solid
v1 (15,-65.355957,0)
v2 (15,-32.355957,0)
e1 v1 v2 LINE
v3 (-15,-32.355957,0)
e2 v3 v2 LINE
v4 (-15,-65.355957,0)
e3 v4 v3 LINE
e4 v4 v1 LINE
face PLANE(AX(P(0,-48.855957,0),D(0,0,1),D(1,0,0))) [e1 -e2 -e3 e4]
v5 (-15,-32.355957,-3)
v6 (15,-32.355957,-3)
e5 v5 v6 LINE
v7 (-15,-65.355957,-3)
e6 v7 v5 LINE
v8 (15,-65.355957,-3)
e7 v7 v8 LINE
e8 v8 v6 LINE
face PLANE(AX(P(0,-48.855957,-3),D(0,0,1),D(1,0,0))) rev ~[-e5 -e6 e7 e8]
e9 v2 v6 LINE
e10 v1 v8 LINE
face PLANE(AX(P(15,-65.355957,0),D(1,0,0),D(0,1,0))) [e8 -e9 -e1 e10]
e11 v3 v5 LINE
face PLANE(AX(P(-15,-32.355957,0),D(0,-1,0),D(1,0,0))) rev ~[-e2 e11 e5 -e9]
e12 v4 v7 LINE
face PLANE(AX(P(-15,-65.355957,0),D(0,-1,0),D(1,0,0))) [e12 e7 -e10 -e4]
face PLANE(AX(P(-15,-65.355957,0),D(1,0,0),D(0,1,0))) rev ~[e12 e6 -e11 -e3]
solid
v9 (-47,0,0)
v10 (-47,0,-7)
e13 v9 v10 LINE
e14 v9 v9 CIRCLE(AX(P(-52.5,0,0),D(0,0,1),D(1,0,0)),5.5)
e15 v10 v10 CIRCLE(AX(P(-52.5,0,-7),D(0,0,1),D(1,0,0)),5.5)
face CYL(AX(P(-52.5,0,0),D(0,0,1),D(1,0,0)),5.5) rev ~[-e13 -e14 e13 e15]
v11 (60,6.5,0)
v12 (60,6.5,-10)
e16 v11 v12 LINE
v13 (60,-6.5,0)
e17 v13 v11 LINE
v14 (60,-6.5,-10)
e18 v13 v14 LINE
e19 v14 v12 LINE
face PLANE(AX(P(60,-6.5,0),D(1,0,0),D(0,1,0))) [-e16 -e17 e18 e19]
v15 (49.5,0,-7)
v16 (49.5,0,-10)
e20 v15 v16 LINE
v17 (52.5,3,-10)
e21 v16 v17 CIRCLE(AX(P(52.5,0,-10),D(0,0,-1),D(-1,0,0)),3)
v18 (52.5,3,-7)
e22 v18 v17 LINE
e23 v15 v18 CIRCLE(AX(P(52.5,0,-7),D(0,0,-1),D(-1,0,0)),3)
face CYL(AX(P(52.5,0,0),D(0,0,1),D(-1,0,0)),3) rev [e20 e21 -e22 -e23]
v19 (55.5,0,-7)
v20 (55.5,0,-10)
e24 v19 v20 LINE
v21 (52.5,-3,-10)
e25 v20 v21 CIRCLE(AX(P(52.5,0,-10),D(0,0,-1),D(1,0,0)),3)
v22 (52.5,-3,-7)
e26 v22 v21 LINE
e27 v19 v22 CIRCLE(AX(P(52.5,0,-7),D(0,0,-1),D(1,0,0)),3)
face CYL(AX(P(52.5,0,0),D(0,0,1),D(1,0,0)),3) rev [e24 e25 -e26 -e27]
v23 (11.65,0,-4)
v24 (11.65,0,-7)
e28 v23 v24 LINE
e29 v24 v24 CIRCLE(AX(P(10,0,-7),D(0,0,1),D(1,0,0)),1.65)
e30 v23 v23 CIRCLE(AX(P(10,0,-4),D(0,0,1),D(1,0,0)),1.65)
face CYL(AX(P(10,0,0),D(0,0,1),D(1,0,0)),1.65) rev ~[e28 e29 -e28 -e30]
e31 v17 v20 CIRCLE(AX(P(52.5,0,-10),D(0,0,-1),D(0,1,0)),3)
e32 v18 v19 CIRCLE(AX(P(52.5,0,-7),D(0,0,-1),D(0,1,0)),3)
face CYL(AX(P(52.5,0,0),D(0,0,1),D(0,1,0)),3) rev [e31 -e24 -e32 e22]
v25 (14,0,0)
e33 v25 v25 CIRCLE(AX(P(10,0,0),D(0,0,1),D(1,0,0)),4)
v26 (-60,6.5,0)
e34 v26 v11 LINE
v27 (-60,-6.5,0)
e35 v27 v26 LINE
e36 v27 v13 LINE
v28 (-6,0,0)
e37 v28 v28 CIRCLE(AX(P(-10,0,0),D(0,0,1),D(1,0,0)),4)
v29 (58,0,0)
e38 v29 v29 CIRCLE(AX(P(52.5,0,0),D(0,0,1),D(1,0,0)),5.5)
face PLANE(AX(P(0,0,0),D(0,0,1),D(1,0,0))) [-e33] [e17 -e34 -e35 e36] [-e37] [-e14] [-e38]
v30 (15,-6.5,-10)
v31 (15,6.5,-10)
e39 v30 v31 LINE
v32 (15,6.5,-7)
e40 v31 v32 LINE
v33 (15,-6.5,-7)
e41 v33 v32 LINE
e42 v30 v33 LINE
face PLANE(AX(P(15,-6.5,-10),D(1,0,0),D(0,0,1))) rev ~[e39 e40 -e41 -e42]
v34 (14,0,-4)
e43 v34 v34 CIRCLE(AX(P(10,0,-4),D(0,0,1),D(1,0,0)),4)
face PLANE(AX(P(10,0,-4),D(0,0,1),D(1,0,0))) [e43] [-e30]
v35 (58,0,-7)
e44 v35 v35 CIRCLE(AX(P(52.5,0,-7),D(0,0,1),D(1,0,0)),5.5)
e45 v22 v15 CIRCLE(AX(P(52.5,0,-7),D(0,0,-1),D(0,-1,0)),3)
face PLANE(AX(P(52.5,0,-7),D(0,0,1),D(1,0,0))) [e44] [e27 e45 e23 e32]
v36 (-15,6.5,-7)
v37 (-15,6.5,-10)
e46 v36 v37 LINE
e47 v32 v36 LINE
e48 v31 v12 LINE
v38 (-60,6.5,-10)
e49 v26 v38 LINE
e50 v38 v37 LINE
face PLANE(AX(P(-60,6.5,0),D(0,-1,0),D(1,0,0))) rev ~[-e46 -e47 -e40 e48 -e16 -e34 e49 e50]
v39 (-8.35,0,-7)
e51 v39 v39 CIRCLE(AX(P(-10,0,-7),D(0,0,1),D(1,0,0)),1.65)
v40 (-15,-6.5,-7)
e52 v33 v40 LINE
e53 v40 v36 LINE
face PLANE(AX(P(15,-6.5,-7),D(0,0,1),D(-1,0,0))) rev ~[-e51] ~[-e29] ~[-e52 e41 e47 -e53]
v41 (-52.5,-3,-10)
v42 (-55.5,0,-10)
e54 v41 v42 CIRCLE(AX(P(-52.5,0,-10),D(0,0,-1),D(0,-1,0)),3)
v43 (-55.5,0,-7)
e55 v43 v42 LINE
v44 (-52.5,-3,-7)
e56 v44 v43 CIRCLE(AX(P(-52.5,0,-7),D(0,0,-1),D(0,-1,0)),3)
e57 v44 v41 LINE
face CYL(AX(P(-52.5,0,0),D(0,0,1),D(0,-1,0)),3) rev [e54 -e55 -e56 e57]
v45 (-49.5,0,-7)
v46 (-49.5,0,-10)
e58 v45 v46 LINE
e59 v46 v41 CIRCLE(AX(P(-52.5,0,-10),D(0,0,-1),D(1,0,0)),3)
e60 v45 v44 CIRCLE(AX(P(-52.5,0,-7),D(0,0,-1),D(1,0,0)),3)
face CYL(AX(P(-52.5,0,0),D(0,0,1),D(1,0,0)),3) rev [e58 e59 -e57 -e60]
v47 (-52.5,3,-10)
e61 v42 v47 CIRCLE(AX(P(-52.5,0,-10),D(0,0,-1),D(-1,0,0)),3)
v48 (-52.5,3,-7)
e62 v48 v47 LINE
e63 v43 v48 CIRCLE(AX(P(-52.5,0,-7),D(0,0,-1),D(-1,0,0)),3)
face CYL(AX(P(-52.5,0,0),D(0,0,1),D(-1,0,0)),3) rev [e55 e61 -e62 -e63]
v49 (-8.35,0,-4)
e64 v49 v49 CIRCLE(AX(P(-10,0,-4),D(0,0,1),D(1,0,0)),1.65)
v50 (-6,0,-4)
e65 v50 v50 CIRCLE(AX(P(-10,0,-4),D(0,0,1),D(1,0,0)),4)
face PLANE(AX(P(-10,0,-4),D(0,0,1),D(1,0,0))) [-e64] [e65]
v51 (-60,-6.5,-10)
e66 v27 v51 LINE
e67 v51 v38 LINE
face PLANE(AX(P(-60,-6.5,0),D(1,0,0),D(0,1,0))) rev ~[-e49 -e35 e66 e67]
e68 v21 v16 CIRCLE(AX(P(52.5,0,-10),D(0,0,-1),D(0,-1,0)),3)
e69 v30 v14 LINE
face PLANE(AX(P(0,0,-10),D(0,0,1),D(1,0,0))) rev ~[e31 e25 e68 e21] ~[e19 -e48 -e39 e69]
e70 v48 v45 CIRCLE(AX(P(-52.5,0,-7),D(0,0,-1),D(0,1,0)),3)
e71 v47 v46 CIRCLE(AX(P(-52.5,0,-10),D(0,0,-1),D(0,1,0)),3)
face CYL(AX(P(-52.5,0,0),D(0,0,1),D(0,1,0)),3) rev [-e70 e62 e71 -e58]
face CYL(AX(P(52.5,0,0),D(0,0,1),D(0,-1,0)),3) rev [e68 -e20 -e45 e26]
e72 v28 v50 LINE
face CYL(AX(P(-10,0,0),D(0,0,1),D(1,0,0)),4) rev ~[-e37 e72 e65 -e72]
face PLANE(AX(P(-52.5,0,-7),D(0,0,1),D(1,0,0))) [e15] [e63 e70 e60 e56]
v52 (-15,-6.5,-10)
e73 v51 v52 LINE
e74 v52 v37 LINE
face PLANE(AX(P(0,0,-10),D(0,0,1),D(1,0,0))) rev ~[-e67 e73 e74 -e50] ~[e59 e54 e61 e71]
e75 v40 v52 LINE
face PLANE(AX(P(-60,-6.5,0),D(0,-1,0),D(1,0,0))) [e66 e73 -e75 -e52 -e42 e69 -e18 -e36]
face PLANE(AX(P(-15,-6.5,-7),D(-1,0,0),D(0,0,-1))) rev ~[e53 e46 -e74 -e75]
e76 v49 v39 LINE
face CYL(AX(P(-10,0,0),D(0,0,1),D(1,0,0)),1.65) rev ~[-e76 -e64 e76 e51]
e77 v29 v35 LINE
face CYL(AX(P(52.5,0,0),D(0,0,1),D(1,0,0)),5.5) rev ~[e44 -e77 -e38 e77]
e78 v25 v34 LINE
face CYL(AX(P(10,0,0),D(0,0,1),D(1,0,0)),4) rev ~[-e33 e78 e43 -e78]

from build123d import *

# Parameters (mm, degrees)
F0_W     = 120
F0_H     = 13
F0_R     = 5.5
F0_R_2   = 4
F0_R_3   = 1.65
F1_DEPTH = 10
F2_DEPTH = 7
F4_DEPTH = 25
F5_DEPTH = 4
F0_W_2   = 30
F0_H_2   = 33
F6_DEPTH = 3


# Not quite as in the source:
# - a feature names something its author has since deleted; it is built from what else it names


with BuildPart() as f1:
    # F0 (on Top) → F1 (new body)
    with BuildSketch(Plane.XY):
        Rectangle(F0_W, F0_H)
        with Locations((-52.5, 0)):
            Circle(F0_R, mode=Mode.SUBTRACT)
        with Locations((-10, 0)):
            Circle(F0_R_2, mode=Mode.SUBTRACT)
        with Locations((10, 0)):
            Circle(F0_R_2, mode=Mode.SUBTRACT)
        with Locations((52.5, 0)):
            Circle(F0_R, mode=Mode.SUBTRACT)
        with Locations((-52.5, 0)):
            Circle(F0_R)
        with BuildLine():
            ThreePointArc((-55.5, 0), (-54.6213203436, 2.1213203436), (-52.5, 3))
            ThreePointArc((-52.5, 3), (-50.3786796564, 2.1213203436), (-49.5, 0))
            ThreePointArc((-49.5, 0), (-50.3786796564, -2.1213203436), (-52.5, -3))
            ThreePointArc((-52.5, -3), (-54.6213203436, -2.1213203436), (-55.5, 0))
        make_face(mode=Mode.SUBTRACT)
        with Locations((52.5, 0)):
            Circle(F0_R)
        with BuildLine():
            ThreePointArc((52.5, 3), (54.6213203436, 2.1213203436), (55.5, 0))
            ThreePointArc((55.5, 0), (54.6213203436, -2.1213203436), (52.5, -3))
            ThreePointArc((52.5, -3), (50.3786796564, -2.1213203436), (49.5, 0))
            ThreePointArc((49.5, 0), (50.3786796564, 2.1213203436), (52.5, 3))
        make_face(mode=Mode.SUBTRACT)
        with Locations((-10, 0)):
            Circle(F0_R_2)
        with Locations((-10, 0)):
            Circle(F0_R_3, mode=Mode.SUBTRACT)
        with Locations((10, 0)):
            Circle(F0_R_2)
        with Locations((10, 0)):
            Circle(F0_R_3, mode=Mode.SUBTRACT)
    extrude(amount=-F1_DEPTH)

    # F0 (on Top) → F2 (cut)
    with BuildSketch(Plane.XY):
        with Locations((-52.5, 0)):
            Circle(F0_R)
        with BuildLine():
            ThreePointArc((-55.5, 0), (-54.6213203436, 2.1213203436), (-52.5, 3))
            ThreePointArc((-52.5, 3), (-50.3786796564, 2.1213203436), (-49.5, 0))
            ThreePointArc((-49.5, 0), (-50.3786796564, -2.1213203436), (-52.5, -3))
            ThreePointArc((-52.5, -3), (-54.6213203436, -2.1213203436), (-55.5, 0))
        make_face(mode=Mode.SUBTRACT)
        with Locations((52.5, 0)):
            Circle(F0_R)
        with BuildLine():
            ThreePointArc((52.5, 3), (54.6213203436, 2.1213203436), (55.5, 0))
            ThreePointArc((55.5, 0), (54.6213203436, -2.1213203436), (52.5, -3))
            ThreePointArc((52.5, -3), (50.3786796564, -2.1213203436), (49.5, 0))
            ThreePointArc((49.5, 0), (50.3786796564, 2.1213203436), (52.5, 3))
        make_face(mode=Mode.SUBTRACT)
    extrude(amount=-F2_DEPTH, mode=Mode.SUBTRACT)

    # F3 (on face) → F4 (cut)
    with BuildSketch(Plane.XZ.offset(6.5)):
        Polygon((-15, -10), (0, -10), (15, -10), (15, -7), (0, -7), (-15, -7), align=None)
    extrude(amount=-F4_DEPTH, mode=Mode.SUBTRACT)

    # F0 (on Top) → F5 (cut)
    with BuildSketch(Plane.XY):
        with Locations((-10, 0)):
            Circle(F0_R_2)
        with Locations((-10, 0)):
            Circle(F0_R_3, mode=Mode.SUBTRACT)
        with Locations((10, 0)):
            Circle(F0_R_2)
        with Locations((10, 0)):
            Circle(F0_R_3, mode=Mode.SUBTRACT)
    extrude(amount=-F5_DEPTH, mode=Mode.SUBTRACT)


with BuildPart() as f6:
    # F0 (on Top) → F6 (new body)
    with BuildSketch(Plane.XY):
        with Locations((0, -48.8559566438)):
            Rectangle(F0_W_2, F0_H_2)
    extrude(amount=-F6_DEPTH)


solid = Compound([f1.part, f6.part])
